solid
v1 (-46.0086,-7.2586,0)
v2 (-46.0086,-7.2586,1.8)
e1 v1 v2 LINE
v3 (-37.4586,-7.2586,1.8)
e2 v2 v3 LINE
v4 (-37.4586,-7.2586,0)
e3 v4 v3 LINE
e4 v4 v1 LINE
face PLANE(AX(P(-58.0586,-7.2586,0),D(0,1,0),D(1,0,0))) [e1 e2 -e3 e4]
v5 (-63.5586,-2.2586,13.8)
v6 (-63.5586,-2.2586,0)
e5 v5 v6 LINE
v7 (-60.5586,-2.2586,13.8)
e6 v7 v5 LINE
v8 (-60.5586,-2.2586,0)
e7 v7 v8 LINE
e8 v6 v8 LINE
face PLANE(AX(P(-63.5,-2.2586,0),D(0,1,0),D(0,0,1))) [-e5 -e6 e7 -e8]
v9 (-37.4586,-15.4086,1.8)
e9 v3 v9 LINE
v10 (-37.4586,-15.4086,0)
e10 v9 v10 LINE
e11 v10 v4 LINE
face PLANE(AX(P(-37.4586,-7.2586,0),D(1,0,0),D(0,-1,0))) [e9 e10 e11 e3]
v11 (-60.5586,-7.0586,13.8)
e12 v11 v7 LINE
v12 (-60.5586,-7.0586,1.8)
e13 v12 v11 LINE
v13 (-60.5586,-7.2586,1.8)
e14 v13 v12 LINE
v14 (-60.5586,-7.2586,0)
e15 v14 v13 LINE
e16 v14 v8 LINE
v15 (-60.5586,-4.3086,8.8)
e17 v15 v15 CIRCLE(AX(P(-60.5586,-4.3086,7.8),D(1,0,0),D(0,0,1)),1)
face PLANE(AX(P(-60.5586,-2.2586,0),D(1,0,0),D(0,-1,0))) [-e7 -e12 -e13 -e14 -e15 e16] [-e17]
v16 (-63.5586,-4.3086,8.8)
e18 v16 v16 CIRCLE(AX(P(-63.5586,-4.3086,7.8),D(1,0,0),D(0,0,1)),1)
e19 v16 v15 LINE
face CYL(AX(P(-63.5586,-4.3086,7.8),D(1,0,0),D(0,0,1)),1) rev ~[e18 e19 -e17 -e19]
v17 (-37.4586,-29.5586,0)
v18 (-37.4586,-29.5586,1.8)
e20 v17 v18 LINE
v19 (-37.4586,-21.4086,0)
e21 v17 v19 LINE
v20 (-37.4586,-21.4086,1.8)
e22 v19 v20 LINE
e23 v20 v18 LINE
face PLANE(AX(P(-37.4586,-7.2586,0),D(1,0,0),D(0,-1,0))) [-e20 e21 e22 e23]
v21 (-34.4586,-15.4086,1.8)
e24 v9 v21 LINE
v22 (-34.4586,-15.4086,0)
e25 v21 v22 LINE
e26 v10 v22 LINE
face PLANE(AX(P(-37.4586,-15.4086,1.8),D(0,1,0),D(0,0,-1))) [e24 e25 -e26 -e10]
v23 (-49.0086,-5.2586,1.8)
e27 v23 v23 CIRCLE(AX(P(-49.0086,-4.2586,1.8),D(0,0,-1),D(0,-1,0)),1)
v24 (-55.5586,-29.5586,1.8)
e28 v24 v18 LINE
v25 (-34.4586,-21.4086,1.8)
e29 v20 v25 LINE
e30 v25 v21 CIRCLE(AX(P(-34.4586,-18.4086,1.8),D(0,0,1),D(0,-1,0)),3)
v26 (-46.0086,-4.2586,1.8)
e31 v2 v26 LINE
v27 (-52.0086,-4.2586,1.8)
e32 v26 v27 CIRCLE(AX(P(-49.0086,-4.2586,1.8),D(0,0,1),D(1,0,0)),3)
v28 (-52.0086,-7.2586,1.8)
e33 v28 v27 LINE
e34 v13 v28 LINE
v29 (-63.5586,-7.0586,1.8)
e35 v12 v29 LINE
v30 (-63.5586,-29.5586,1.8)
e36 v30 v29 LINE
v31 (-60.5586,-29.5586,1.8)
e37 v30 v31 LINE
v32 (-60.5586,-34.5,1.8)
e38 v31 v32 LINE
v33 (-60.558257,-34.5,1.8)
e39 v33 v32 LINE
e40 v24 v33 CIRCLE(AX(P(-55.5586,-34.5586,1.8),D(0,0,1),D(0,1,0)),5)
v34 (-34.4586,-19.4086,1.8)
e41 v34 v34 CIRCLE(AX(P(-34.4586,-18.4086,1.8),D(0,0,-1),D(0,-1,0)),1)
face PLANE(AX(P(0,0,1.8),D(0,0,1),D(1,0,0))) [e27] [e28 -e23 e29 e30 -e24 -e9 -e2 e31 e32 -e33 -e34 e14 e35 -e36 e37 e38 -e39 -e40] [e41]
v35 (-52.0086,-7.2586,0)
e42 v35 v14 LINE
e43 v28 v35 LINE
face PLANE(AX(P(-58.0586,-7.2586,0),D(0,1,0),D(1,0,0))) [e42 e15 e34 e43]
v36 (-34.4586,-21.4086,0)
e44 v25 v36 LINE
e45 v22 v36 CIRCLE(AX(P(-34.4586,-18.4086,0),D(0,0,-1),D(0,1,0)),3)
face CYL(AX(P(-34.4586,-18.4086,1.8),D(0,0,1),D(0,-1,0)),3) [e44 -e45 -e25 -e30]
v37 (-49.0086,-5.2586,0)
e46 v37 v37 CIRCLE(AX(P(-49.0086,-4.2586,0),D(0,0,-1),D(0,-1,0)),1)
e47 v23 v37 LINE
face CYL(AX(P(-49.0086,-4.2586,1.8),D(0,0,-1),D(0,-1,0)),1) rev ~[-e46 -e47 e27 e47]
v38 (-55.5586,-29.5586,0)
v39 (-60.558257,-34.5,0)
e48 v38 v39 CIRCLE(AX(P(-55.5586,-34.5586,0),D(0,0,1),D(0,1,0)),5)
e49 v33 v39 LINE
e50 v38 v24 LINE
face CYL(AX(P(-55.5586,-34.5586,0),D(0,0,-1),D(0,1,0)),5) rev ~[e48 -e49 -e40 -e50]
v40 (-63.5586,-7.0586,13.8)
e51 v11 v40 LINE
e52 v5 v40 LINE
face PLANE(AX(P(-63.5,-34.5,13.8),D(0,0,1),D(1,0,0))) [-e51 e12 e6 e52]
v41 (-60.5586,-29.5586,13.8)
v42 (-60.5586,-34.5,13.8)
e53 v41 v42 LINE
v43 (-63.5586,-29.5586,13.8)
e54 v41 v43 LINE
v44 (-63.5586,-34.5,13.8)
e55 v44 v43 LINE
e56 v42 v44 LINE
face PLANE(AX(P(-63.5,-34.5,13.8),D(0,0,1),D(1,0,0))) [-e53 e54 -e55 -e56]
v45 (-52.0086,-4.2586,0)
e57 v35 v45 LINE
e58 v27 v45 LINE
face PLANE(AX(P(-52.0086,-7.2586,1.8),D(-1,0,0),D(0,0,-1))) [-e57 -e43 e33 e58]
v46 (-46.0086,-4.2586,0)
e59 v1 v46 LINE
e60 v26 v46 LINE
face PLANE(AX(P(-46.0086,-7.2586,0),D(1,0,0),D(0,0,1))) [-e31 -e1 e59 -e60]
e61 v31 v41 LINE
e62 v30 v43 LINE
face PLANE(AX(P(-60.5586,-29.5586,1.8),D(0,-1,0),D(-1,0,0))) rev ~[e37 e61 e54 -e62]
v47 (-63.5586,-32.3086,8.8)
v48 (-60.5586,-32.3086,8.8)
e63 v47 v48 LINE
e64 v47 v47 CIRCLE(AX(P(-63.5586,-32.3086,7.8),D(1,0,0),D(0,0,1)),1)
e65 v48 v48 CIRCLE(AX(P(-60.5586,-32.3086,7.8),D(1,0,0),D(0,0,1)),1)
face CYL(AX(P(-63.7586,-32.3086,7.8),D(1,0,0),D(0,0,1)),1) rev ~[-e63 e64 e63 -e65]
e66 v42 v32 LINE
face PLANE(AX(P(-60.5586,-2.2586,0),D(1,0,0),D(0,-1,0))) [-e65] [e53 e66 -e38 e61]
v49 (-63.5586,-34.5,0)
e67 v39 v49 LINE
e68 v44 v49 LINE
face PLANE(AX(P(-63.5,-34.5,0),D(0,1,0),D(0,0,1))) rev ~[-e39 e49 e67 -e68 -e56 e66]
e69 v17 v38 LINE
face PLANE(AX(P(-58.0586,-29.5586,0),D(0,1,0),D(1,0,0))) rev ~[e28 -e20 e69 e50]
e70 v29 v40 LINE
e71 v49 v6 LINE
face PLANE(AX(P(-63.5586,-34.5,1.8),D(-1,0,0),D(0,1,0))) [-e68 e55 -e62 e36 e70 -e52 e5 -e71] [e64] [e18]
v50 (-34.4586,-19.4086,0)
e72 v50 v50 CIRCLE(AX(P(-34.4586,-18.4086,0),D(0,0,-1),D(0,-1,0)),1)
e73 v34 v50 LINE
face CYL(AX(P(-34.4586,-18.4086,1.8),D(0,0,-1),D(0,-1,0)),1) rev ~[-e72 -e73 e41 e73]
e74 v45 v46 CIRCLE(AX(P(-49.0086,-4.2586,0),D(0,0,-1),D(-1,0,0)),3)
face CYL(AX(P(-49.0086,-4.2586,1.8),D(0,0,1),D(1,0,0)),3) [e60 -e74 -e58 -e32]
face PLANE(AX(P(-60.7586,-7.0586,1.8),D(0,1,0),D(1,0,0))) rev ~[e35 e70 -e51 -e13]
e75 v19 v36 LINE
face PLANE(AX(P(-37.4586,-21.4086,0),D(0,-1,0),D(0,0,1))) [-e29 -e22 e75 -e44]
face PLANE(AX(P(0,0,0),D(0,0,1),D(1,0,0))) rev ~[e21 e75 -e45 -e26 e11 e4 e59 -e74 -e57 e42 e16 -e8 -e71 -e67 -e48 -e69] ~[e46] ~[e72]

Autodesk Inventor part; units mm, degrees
sketch "Boceto2" plane through (0, 0, 0) normal (0, 0, 1) x (1, 0, 0)
  circle A0 centre (60.5, -11.7293) radius 1.25 projected
  circle A1 centre (60.5, -32) radius 1.25 projected
  line L0 (-63.5, 34.5) -> (63.5, 34.5) projected
  line L1 (-63.5, -34.5) -> (-63.5, 34.5) projected
  line L2 (63.5, -34.5) -> (-63.5, -34.5) projected
  line L3 (63.5, 34.5) -> (63.5, -34.5) projected
  line L4 (-37.2586, -7.2586) -> (-37.2586, -29.3586) projected
  line L5 (-58.4586, -34.5586) -> (-60.3586, -34.5586) projected
  line L6 (-70.2586, -17.8586) -> (-70.2586, -21.2586) projected
  line L7 (-60.3586, -2.2586) -> (-58.4586, -2.2586) projected
  line L8 (-58.4586, -2.2586) -> (-58.4586, -34.3586) projected
  line L9 (-60.3586, -34.3586) -> (-60.3586, -29.3586) projected
  line L10 (-60.5586, -2.2586) -> (-60.5586, -6.8586) projected
  line L11 (-60.5586, -2.2586) -> (-63.5, -2.2586)
  line L12 (-63.5, -2.2586) -> (-63.5, -34.5)
  line L13 (-63.5, -34.5) -> (-60.5586, -34.5)
  line L14 (-60.5586, -34.5) -> (-60.5586, -2.2586)
  circle A2 centre (-49.0086, -4.2586) radius 1 projected
  circle A3 centre (-34.4586, -18.4086) radius 1 projected
  point P0 (0, 0)
ref_plane "Plano de trabajo1" through (-63.7586, -34.3586, 1.8) normal (0, 0, -1) x (0, 1, 0)
extrude "Extrusión1" add sketch "Boceto2" along normal up to surface (1.8 mm away) contours L11 L10 L14 L2 L1
sketch "Boceto3" plane through (-63.5, -34.5, 1.8) normal (0, 0, 1) x (1, 0, 0)
  line L0 (2.9414, 4.9414) -> (-0.2586, 4.9414) projected
  line L1 (-0.0586, 27.4414) -> (2.7414, 27.4414) projected
  line L2 (-0.0586, 27.4414) -> (2.9414, 27.4414)
  line L3 (2.9414, 27.4414) -> (2.9414, 32.2414)
  line L4 (2.9414, 32.2414) -> (-0.0586, 32.2414)
  line L5 (-0.0586, 32.2414) -> (-0.0586, 27.4414)
  line L6 (-0.2586, 4.9414) -> (2.9414, 4.9414)
  line L7 (2.9414, 4.9414) -> (2.9414, 0)
  line L8 (2.9414, 0) -> (-0.2586, 0)
  line L9 (-0.2586, 0) -> (-0.2586, 4.9414)
  point P0 (63.5, 34.5)
ref_plane "Plano de trabajo2" through (-63.7586, -34.3586, 13.8) normal (0, 0, -1) x (0, 1, 0)
extrude "Extrusión2" add sketch "Boceto3" along normal up to surface (12 mm away)
sketch "Boceto4" plane through (-63.5586, -7.0586, 1.8) normal (-1, 0, 0) x (0, 0, 1)
  arc A0 (5.3, 3.7247) -> (6.7, 3.7247) centre (6, 2.75) ccw projected
  arc A1 (6.5, -26.3409) -> (5.3, -26.2247) centre (6, -25.25) ccw projected
  arc A2 (6.5, -26.3409) -> (5.3, -26.2247) centre (6, -25.25) ccw projected
  arc A3 (6.5, -26.3409) -> (5.3, -26.2247) centre (6, -25.25) ccw projected
  point P0 (-1.8, 7.0586)
hole "Agujero1" at (-63.5586, -4.3086, 7.8) direction (1, 0, 0) diameter 2 end up to surface
sketch "Boceto5" plane through (-63.7586, -34.5, 1.8) normal (-1, 0, 0) x (0, 0, 1)
  arc A0 (6.5, 1.1006) -> (5.3, 1.2167) centre (6, 2.1914) ccw projected
  point P0 (-1.8, 34.5)
hole "Agujero2" at (-63.7586, -32.3086, 7.8) direction (1, 0, 0) diameter 2 end up to surface
move faces "Desplazar1" translate (-0.0586, 0, 0) faces at (-63.5, -14.6057, 0.6)
move faces "Desplazar2" translate (0.2, 0, 0) faces at (-63.7586, -32.1224, 3.4667)
ref_plane "Plano de trabajo3" through (0, 0, 0) normal (0, 0, 1) x (1, 0, 0)
sketch "Boceto6" plane through (0, 0, 0) normal (0, 0, 1) x (1, 0, 0)
  line L0 (-37.4586, -7.2586) -> (-37.4586, -29.3586) projected
  line L1 (-37.4586, -29.3586) -> (-37.4586, -38.3484)
  circle A0 centre (60.5, -11.7293) radius 1.25 projected
  circle A1 centre (60.5, -32) radius 1.25 projected
  line L2 (-63.5, 34.5) -> (63.5, 34.5) projected
  line L3 (-63.5, -34.5) -> (-63.5, 34.5) projected
  line L4 (63.5, -34.5) -> (-63.5, -34.5) projected
  line L5 (63.5, 34.5) -> (63.5, -34.5) projected
  line L6 (-58.0586, -7.2586) -> (-37.4586, -7.2586) projected
  line L7 (-58.0586, -29.5586) -> (-37.4586, -29.5586) projected
  line L8 (-37.4586, -29.5586) -> (-60.5586, -29.5586)
  line L9 (-60.5586, -34.5) -> (-60.5586, -2.2586) projected
  line L10 (-60.5586, -29.5586) -> (-37.4586, -29.5586)
  line L11 (-37.4586, -29.5586) -> (-37.4586, -7.2586)
  line L12 (-37.4586, -7.2586) -> (-60.5586, -7.2586)
  line L13 (-60.5586, -7.2586) -> (-60.5586, -29.5586)
  circle A2 centre (-49.0086, -4.2586) radius 1 projected
  circle A3 centre (-34.4586, -18.4086) radius 1 projected
  point P0 (0, 0)
ref_plane "Plano de trabajo4" through (-58.0586, -29.3586, 1.8) normal (0, 0, 1) x (1, 0, 0)
extrude "Extrusión3" add sketch "Boceto6" along normal up to surface (1.8 mm away) contours L0 L1 L7 L8 L9 L12 L6
sketch "Boceto7" plane through (-37.4586, -29.5586, 0) normal (1, 0, 0) x (0, 0, -1)
  line L0 (-1.8, 0) -> (-1.8, 22.3)
  line L1 (-1.8, 22.3) -> (-1.8, 0) projected
  line L2 (-1.8, 11.15) -> (0, 11.15)
  line L3 (0, 0) -> (0, 22.3) projected
  line L4 (0, 8.15) -> (-1.8, 8.15)
  line L5 (-1.8, 8.15) -> (-1.8, 14.15)
  line L6 (-1.8, 14.15) -> (0, 14.15)
  line L7 (0, 14.15) -> (0, 8.15)
  line L8 (0, 8.15) -> (-1.8, 14.15) construction
  line L9 (-1.8, 8.15) -> (0, 14.15) construction
  point P0 (0, 29.5586)
  point P1 (-0.9, 11.15)
  dimension "d26" = 6
extrude "Extrusión4" add sketch "Boceto7" along normal blind 6
sketch "Boceto8" plane through (-63.5586, -7.0586, 1.8) normal (0, 0, 1) x (1, 0, 0)
  line L0 (26.1, -14.35) -> (26.1, -8.35)
  line L1 (26.1, -14.35) -> (29.1, -14.35)
  line L2 (26.1, -14.35) -> (32.1, -14.35) projected
  line L3 (26.1, -8.35) -> (32.1, -8.35) projected
  line L4 (29.1, -8.35) -> (29.1, -14.35)
  arc A0 (29.1, -14.35) -> (29.1, -8.35) centre (29.1, -11.35) ccw
  line L5 (32.1, -14.35) -> (32.1, -8.35)
  line L6 (29.1, -8.35) -> (32.0071, -8.35)
  line L7 (29.1, -14.35) -> (32.1, -14.35)
  point P0 (63.5586, 7.0586)
ref_plane "Plano de trabajo5" through (-63.5, -34.5, 0) normal (0, 0, 1) x (1, 0, 0)
extrude "Extrusión5" cut sketch "Boceto8" against normal up to surface (1.8 mm away) contours A0 L5 L2 | L3 L5 A0
hole "Agujero3" at (-34.4586, -18.4086, 1.8) direction (0, 0, -1) diameter 2 depth 1.8 tip angle 118
sketch "Boceto10" plane through (-60.5586, -7.2586, 0) normal (0, 1, 0) x (1, 0, 0)
  line L0 (23.1, 0) -> (0, 0) projected
  line L1 (11.55, 0) -> (11.55, -1.8)
  line L2 (0, -1.8) -> (23.1, -1.8) projected
  line L3 (14.55, -1.8) -> (8.55, -1.8)
  line L4 (8.55, -1.8) -> (8.55, 0)
  line L5 (8.55, 0) -> (14.55, 0)
  line L6 (14.55, 0) -> (14.55, -1.8)
  line L7 (14.55, -1.8) -> (8.55, 0) construction
  line L8 (8.55, -1.8) -> (14.55, 0) construction
  point P0 (60.5586, 0)
  point P1 (11.55, -0.9)
  dimension "d40" = 6
extrude "Extrusión6" add sketch "Boceto10" along normal blind 6
sketch "Boceto11" plane through (-63.5586, -7.0586, 1.8) normal (0, 0, 1) x (1, 0, 0)
  line L0 (17.55, -0.2) -> (17.55, 5.8) projected
  line L1 (17.55, 2.8) -> (11.55, 2.8)
  line L2 (11.55, -0.2) -> (11.55, 5.8) projected
  arc A0 (17.55, 2.8) -> (11.55, 2.8) centre (14.55, 2.8) ccw
  line L3 (17.55, 5.8) -> (11.55, 5.8)
  line L4 (11.55, 2.8) -> (11.55, 5.8)
  line L5 (11.55, 5.8) -> (17.55, 5.8) projected
  line L6 (17.55, 2.8) -> (17.55, 5.8)
  point P0 (63.5586, 7.0586)
ref_plane "Plano de trabajo6" through (-63.5, -34.5, 0) normal (0, 0, 1) x (1, 0, 0)
extrude "Extrusión7" cut sketch "Boceto11" against normal up to surface (1.8 mm away) contours A0 L3 L0 | L2 L3 A0
hole "Agujero4" at (-49.0086, -4.2586, 1.8) direction (0, 0, -1) diameter 2 depth 1.8 tip angle 118
fillet "Empalme1" radius 5 1 edges at (-60.5586, -29.5586, 0.9)
properties part number "soporteIzq"
